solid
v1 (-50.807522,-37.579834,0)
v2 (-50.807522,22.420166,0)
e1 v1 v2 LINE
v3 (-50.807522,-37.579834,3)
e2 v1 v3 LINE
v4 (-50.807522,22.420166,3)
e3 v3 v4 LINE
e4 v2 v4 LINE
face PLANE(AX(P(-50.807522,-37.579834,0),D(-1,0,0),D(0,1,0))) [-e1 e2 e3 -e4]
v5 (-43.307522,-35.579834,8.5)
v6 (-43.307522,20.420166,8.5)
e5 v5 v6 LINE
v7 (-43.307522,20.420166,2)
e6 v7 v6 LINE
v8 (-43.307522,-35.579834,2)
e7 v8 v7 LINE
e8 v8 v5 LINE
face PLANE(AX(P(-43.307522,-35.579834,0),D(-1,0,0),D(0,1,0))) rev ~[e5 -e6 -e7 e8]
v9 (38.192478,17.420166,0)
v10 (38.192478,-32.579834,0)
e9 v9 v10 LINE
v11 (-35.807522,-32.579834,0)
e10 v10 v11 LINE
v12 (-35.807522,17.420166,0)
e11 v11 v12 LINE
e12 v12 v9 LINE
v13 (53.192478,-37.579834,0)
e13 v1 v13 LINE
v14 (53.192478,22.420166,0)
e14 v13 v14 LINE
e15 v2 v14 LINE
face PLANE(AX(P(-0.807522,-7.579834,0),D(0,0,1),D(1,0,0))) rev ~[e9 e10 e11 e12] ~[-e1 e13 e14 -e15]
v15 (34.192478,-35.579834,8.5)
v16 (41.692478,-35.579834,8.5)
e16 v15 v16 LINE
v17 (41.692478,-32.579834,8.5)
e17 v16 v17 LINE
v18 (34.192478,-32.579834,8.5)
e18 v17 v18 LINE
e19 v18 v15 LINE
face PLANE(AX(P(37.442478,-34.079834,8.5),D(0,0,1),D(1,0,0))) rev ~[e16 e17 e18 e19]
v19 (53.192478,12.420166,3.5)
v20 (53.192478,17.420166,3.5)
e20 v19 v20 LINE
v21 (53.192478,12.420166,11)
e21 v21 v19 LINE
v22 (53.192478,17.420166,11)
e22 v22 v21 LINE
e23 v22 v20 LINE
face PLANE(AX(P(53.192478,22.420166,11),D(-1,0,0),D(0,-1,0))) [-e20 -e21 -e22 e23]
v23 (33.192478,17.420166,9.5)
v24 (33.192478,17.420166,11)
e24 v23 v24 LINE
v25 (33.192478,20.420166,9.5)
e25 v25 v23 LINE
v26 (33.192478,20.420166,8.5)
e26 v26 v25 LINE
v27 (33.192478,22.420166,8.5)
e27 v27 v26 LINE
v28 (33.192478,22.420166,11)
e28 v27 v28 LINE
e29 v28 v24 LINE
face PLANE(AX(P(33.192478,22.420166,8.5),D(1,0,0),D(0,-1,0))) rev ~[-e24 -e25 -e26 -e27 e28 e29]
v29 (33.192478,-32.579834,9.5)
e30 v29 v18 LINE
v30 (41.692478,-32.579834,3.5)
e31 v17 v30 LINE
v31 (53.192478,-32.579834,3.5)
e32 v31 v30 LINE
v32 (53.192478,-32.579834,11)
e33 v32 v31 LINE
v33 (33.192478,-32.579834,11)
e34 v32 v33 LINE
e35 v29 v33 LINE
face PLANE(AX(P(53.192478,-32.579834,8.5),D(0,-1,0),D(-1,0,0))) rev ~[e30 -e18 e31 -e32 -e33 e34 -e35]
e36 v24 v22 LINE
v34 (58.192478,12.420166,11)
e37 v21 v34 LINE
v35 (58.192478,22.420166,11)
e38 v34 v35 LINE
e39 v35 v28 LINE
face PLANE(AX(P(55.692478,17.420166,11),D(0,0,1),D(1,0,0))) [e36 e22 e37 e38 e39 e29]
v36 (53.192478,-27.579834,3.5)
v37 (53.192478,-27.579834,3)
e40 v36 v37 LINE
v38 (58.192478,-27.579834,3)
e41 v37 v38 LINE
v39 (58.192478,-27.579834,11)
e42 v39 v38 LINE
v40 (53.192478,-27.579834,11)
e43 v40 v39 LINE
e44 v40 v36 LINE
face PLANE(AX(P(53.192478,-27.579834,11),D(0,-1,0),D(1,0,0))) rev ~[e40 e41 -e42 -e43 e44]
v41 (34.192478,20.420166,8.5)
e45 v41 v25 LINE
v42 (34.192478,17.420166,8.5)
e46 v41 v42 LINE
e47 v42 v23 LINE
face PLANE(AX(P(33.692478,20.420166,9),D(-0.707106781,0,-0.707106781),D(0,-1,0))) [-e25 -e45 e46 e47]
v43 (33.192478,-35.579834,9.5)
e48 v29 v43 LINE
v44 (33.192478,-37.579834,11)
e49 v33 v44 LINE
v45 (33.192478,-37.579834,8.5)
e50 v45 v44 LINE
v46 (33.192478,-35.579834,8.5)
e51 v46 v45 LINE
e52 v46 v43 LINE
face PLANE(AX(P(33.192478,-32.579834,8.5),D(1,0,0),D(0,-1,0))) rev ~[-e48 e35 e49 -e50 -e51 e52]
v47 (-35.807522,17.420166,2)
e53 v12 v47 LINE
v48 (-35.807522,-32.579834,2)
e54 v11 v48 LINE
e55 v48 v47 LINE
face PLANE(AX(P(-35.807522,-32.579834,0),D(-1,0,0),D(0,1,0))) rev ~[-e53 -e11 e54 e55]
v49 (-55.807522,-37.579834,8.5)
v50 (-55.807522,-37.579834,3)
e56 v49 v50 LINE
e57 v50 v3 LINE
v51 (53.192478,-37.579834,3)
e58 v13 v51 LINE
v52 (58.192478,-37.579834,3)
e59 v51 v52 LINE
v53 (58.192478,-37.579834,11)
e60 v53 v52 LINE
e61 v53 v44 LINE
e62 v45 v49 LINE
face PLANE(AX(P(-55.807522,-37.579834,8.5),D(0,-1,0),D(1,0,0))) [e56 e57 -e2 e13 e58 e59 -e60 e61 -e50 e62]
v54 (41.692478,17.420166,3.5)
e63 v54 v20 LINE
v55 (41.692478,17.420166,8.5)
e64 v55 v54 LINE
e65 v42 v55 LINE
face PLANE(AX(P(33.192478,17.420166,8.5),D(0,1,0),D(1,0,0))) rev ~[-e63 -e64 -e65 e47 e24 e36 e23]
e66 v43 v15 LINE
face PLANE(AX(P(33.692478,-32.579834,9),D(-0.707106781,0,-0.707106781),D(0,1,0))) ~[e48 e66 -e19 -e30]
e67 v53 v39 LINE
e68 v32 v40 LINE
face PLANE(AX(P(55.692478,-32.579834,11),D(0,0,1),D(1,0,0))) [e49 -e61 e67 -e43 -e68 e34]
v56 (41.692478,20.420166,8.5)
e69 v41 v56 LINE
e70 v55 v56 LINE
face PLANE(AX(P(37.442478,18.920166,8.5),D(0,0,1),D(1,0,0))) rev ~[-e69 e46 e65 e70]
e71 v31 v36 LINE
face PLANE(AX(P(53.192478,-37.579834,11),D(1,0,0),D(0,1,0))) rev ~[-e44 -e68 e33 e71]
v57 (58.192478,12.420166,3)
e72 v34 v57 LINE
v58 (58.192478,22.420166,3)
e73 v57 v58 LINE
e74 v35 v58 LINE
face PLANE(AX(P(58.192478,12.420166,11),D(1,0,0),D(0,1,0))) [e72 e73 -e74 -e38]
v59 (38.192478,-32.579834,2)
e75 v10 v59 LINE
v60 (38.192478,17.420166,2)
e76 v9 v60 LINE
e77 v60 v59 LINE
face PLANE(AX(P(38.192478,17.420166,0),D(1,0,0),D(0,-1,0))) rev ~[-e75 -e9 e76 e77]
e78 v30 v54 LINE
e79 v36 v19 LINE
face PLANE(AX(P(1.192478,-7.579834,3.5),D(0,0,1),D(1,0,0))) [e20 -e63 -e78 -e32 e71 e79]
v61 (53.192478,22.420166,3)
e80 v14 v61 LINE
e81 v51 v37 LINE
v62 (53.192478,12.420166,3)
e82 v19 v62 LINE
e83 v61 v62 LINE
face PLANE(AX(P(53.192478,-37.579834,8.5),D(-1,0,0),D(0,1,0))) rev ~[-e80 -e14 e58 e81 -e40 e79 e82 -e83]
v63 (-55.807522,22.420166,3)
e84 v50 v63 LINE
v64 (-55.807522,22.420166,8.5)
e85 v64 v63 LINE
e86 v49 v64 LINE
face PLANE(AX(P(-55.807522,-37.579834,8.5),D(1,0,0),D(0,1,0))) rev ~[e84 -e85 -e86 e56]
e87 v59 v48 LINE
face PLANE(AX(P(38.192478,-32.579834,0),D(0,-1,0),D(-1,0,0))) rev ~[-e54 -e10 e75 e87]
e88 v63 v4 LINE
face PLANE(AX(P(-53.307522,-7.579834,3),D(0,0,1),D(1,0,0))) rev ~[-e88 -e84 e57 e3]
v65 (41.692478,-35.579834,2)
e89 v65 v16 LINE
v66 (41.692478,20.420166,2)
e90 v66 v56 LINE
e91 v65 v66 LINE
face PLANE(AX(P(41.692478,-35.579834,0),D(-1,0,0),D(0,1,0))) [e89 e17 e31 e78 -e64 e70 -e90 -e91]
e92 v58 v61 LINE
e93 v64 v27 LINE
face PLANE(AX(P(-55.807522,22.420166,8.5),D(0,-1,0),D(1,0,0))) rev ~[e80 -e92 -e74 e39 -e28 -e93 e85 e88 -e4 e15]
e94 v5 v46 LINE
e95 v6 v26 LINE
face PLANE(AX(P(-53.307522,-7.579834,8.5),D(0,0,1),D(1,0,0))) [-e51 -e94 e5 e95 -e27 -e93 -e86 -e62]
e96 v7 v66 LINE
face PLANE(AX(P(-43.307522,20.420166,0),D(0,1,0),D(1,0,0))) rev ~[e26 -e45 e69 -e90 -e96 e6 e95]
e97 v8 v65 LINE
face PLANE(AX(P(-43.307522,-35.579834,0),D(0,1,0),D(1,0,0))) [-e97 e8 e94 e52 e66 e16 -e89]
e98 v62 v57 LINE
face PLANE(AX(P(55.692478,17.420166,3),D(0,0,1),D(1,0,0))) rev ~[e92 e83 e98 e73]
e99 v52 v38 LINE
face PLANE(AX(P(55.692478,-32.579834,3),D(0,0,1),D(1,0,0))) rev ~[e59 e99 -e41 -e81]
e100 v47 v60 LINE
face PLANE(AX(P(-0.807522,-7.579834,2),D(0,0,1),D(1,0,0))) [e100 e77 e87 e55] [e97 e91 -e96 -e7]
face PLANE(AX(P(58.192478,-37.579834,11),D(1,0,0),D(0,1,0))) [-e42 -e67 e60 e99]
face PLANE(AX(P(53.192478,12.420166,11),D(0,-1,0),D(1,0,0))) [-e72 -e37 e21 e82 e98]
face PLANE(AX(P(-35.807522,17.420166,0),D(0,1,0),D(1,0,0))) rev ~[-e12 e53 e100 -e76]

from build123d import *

# Parameters (mm, degrees)
F0_W      = 104
F0_H      = 60
F0_W_2    = 85
F0_H_2    = 56
F1_DEPTH  = 8.5
F2_DEPTH  = 2
F3_W      = 8.5
F3_H      = 3
F4_DEPTH  = 2.5
F5_SIZE   = 1
F6_DEPTH  = 5
F7_W      = 5
F7_H      = 10
F8_DEPTH  = 8
F9_W      = 5
F9_H      = 60
F10_DEPTH = 5.5


with BuildPart() as f1:
    # F0 (on Top) → F1 (new body)
    with BuildSketch(Plane.XY):
        with Locations((1.1924776137, -7.5798341542)):
            Rectangle(F0_W, F0_H)
        with Locations((-0.8075223863, -7.5798341542)):
            Rectangle(F0_W_2, F0_H_2, mode=Mode.SUBTRACT)
    extrude(amount=F1_DEPTH)

    # F0 (on Top) → F2 (join)
    with BuildSketch(Plane.XY):
        with Locations((-0.8075223863, -7.5798341542)):
            Rectangle(F0_W_2, F0_H_2)
        Polygon((-35.8075223863, -32.5798341542), (-35.8075223863, 17.4201658458), (34.1924776137, 17.4201658458), (38.1924776137, 17.4201658458), (38.1924776137, -32.5798341542), align=None, mode=Mode.SUBTRACT)
    extrude(amount=F2_DEPTH)

    # F3 (on face) → F4 (join)
    with BuildSketch(Plane.XY.offset(8.5)):
        with Locations((37.4424776137, -34.0798341542)):
            Rectangle(F3_W, F3_H)
        with Locations((37.4424776137, 18.9201658458)):
            Rectangle(F3_W, F3_H)
        Polygon((33.1924776137, -37.5798341542), (53.1924776137, -37.5798341542), (53.1924776137, -32.5798341542), (41.6924776137, -32.5798341542), (41.6924776137, -35.5798341542), (33.1924776137, -35.5798341542), align=None)
        Polygon((41.6924776137, 17.4201658458), (53.1924776137, 17.4201658458), (53.1924776137, 22.4201658458), (33.1924776137, 22.4201658458), (33.1924776137, 20.4201658458), (41.6924776137, 20.4201658458), align=None)
    extrude(amount=F4_DEPTH)

    # F5
    f5_edges = [f1.edges().sort_by_distance(p)[0] for p in [
        (33.192478, 18.920166, 8.5),
        (33.192478, -34.079834, 8.5),
    ]]
    chamfer(f5_edges, length=F5_SIZE)

    # F6 (cut): a face of the model
    f6_faces = [f1.faces().sort_by_distance(p)[0] for p in [
        (47.4424776137, -7.5798341542, 8.5),
    ]]
    extrude(f6_faces, amount=-F6_DEPTH, mode=Mode.SUBTRACT)

    # F7 (on face) → F8 (join)
    with BuildSketch(Plane.XY.offset(11)):
        Polygon((53.1924776137, 17.4201658458), (53.1924776137, 12.4201658458), (58.1924776137, 12.4201658458), (58.1924776137, 22.4201658458), (53.1924776137, 22.4201658458), align=None)
        with Locations((55.6924776137, -32.5798341542)):
            Rectangle(F7_W, F7_H)
    extrude(amount=-F8_DEPTH)

    # F9 (on face) → F10 (join)
    with BuildSketch(Plane.XY.offset(8.5)):
        with Locations((-53.3075223863, -7.5798341542)):
            Rectangle(F9_W, F9_H)
    extrude(amount=-F10_DEPTH)


solid = f1.part
